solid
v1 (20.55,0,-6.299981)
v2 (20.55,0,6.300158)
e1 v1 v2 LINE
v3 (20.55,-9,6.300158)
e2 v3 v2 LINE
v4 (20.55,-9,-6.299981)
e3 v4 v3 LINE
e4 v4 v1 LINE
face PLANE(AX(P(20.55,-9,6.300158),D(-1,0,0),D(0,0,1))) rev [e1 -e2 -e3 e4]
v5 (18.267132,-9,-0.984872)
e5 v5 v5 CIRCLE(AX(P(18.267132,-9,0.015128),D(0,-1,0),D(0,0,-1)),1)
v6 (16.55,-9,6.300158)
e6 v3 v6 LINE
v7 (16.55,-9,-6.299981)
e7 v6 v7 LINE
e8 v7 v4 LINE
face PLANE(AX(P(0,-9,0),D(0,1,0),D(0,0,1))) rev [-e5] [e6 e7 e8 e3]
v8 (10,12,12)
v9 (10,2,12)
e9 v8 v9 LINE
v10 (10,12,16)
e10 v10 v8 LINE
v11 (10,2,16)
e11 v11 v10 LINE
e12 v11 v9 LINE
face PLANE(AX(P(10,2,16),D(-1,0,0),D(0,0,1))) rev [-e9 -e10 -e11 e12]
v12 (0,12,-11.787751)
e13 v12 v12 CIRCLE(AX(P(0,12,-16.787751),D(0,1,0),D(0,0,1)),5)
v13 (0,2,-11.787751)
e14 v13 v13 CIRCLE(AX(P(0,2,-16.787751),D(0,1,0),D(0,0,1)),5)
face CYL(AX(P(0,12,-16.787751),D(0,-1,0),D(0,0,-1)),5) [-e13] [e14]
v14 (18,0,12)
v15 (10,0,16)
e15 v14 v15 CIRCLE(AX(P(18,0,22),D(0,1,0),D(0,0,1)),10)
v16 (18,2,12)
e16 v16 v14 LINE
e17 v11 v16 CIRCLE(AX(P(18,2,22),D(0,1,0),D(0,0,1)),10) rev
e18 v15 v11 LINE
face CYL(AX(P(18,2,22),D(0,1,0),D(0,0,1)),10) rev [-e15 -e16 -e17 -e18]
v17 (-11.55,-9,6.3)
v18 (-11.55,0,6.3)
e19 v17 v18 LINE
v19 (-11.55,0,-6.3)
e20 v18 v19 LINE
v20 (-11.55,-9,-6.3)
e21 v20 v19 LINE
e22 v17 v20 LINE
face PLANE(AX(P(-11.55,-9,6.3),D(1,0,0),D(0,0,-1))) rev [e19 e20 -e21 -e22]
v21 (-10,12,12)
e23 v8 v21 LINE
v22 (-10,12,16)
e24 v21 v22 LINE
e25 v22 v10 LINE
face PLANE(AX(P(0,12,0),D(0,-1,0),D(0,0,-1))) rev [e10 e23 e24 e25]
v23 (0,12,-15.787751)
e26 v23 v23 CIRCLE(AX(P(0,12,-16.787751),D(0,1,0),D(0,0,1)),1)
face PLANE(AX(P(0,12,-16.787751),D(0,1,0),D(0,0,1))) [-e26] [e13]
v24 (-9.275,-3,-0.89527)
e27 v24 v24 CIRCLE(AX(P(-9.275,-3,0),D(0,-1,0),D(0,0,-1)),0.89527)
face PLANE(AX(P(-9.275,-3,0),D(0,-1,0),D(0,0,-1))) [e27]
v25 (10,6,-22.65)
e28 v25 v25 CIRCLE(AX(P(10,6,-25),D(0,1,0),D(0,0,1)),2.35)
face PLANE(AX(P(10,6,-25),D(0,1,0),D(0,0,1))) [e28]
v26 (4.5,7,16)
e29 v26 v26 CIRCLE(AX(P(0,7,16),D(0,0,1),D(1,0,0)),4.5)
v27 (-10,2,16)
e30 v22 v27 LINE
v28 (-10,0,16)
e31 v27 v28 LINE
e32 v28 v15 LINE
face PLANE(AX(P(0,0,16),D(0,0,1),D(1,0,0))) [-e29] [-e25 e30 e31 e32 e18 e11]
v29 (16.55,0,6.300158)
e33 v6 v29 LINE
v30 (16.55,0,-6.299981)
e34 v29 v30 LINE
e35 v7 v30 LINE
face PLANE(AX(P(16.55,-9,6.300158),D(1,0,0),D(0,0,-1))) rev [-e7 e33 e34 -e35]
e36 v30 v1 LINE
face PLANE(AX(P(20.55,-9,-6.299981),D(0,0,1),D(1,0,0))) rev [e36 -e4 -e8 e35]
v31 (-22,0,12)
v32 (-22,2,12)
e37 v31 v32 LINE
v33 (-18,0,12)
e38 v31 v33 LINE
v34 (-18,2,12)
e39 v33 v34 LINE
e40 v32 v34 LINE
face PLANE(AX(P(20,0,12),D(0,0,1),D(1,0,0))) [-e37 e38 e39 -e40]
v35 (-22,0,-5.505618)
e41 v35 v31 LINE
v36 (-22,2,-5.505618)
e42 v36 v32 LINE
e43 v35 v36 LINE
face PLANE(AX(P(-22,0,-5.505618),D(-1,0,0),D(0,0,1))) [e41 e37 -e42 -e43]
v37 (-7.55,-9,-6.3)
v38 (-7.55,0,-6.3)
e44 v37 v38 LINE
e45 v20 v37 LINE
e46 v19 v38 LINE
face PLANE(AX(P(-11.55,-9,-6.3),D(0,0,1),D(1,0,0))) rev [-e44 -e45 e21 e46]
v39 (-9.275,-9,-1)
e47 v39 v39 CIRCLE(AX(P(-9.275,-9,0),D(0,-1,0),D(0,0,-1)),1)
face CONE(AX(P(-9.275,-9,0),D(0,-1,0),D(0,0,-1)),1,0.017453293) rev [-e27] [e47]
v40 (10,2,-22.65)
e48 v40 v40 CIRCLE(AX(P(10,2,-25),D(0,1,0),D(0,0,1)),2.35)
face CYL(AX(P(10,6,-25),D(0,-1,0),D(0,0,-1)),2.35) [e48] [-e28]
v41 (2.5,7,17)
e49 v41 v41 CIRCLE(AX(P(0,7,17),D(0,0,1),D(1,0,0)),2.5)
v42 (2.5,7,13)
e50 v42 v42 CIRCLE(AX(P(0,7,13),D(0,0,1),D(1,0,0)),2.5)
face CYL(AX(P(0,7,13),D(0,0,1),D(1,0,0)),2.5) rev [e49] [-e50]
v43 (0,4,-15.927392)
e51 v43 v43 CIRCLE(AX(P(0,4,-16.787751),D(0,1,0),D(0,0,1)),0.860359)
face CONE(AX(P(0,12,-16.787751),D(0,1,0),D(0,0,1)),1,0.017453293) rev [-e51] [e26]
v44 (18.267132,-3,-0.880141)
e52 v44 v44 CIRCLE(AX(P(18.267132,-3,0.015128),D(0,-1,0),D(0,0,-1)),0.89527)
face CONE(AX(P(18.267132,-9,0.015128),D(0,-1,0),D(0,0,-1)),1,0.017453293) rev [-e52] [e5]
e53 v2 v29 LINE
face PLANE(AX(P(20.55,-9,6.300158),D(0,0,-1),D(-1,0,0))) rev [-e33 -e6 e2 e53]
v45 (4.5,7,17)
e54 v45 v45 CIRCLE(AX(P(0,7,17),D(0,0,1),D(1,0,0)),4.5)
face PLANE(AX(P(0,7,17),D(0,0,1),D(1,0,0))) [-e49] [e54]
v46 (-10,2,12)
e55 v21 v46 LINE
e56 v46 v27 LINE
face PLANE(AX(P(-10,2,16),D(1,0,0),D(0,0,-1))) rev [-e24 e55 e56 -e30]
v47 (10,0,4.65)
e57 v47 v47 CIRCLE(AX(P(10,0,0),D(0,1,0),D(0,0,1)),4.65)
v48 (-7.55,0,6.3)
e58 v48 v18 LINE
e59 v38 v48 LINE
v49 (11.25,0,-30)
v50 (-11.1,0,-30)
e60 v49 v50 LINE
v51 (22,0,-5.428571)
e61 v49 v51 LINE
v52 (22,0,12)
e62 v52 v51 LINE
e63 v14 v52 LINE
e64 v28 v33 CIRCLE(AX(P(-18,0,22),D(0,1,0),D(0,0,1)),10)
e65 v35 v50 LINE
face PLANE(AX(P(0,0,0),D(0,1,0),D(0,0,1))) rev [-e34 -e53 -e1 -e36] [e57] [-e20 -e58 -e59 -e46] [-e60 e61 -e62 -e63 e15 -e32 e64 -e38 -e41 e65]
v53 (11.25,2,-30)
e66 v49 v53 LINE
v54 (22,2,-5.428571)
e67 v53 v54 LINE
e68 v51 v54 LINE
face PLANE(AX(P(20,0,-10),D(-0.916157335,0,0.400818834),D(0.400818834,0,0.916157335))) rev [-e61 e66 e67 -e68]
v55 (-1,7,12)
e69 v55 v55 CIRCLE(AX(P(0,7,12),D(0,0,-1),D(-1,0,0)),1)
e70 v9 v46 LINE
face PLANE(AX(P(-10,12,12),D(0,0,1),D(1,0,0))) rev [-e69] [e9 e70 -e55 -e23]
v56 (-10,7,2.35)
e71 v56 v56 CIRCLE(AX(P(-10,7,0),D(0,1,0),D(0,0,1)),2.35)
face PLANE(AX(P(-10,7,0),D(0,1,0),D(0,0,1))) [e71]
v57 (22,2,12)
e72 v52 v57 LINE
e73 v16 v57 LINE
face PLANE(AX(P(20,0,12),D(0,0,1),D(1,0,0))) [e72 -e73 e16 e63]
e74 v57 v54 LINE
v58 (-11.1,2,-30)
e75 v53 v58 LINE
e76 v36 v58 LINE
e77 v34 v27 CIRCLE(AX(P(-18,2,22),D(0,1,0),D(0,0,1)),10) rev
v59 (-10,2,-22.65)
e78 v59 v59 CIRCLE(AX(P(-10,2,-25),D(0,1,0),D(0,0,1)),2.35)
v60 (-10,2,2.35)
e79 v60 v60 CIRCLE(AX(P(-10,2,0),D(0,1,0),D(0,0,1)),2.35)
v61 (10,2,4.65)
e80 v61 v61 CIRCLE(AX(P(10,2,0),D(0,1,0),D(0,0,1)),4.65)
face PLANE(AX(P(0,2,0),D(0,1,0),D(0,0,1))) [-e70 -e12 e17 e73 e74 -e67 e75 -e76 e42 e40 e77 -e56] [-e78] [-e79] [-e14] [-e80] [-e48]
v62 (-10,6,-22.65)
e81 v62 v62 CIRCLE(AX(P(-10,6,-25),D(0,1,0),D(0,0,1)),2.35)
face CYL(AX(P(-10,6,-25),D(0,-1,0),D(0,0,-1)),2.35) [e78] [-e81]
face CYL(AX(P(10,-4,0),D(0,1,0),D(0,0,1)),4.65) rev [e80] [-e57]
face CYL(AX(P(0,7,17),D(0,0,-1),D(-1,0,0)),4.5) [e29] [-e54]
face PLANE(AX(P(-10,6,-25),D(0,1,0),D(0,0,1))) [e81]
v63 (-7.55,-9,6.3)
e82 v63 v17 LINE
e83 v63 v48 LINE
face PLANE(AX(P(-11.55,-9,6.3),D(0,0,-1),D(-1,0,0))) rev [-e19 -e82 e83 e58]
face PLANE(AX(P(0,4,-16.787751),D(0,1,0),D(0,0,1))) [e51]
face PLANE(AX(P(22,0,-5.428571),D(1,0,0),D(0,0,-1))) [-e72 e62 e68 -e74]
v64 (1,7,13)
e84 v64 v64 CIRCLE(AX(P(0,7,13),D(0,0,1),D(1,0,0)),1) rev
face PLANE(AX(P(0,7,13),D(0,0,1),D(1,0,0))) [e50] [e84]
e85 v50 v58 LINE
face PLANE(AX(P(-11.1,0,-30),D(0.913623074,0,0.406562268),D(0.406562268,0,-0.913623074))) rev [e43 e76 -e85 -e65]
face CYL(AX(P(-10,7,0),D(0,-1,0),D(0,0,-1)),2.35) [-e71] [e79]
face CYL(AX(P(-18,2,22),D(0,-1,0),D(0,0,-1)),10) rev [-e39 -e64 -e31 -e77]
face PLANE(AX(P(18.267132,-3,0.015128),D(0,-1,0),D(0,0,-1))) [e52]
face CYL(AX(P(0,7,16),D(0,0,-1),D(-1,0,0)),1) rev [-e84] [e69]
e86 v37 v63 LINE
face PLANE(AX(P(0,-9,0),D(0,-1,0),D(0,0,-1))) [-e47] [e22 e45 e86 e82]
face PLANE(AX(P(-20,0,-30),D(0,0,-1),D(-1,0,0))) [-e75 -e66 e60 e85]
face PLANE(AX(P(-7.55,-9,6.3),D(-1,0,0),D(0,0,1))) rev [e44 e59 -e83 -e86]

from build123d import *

# Parameters (mm, degrees)
SKETCH1_W                     = 40
SKETCH1_H                     = 20
BOSS_EXTRUDE1_DEPTH           = 2
SKETCH5_W                     = 50
SKETCH5_H                     = 20
BOSS_EXTRUDE4_DEPTH           = 2
SKETCH6_R                     = 2.35
BOSS_EXTRUDE5_DEPTH           = 4
SKETCH15_R                    = 4.65
CUT_EXTRUDE6_DEPTH            = 6
SKETCH17_W                    = 10
SKETCH17_H                    = 20
CUT_EXTRUDE8_DEPTH            = 43.614551505
CUT_EXTRUDE9_DEPTH            = 2
SKETCH19_R                    = 2.35
BOSS_EXTRUDE6_DEPTH           = 5
BOSS_EXTRUDE7_DEPTH           = 2
SKETCH21_R                    = 5
BOSS_EXTRUDE8_DEPTH           = 10
SKETCH22_R                    = 1
CUT_EXTRUDE10_DEPTH           = 8
CUT_EXTRUDE10_DRAFT           = -1
SKETCH23_W                    = 4
SKETCH23_H                    = 12.6
SKETCH23_H_2                  = 12.600139219
BOSS_EXTRUDE9_DEPTH           = 9
SKETCH24_R                    = 1
CUT_EXTRUDE11_DEPTH           = 6
CUT_EXTRUDE11_DRAFT           = -1
CUT_EXTRUDE11_PROFILE_2_DEPTH = 6
CUT_EXTRUDE11_PROFILE_2_DRAFT = -1
SKETCH25_W                    = 20
SKETCH25_H                    = 2
BOSS_EXTRUDE10_DEPTH          = 4
SKETCH26_W                    = 20
SKETCH26_H                    = 4
BOSS_EXTRUDE11_DEPTH          = 10
FILLET1_R                     = 10
SKETCH27_R                    = 1
CUT_EXTRUDE13_DEPTH           = 49.908077043
SKETCH28_R                    = 2.5
CUT_EXTRUDE14_DEPTH           = 3
BOSS_EXTRUDE12_START          = 1
SKETCH29_R                    = 4.5
SKETCH29_R_2                  = 2.5
BOSS_EXTRUDE12_DEPTH          = 1


with BuildPart() as part:
    # Sketch1 → Boss-Extrude1 (new body)
    with BuildSketch(Plane(origin=(0, 0, 0), x_dir=(1, 0, 0), z_dir=(0, 1, 0))):
        Rectangle(SKETCH1_W, SKETCH1_H)
    extrude(amount=BOSS_EXTRUDE1_DEPTH)

    # Sketch5 → Boss-Extrude4 (add)
    with BuildSketch(Plane(origin=(0, 2, 0), x_dir=(1, 0, 0), z_dir=(0, 1, 0))):
        with Locations((5, 20)):
            Rectangle(SKETCH5_W, SKETCH5_H)
    extrude(amount=-BOSS_EXTRUDE4_DEPTH)

    # Sketch6 → Boss-Extrude5 (add)
    with BuildSketch(Plane(origin=(0, 2, 0), x_dir=(1, 0, 0), z_dir=(0, 1, 0))):
        with Locations(Location((-10, 25, 0), (0, 0, 270))):
            Circle(SKETCH6_R)
        with Locations(Location((10, 25, 0), (0, 0, 270))):
            Circle(SKETCH6_R)
    extrude(amount=BOSS_EXTRUDE5_DEPTH)

    # Sketch15 → Cut-Extrude6 (cut)
    with BuildSketch(Plane(origin=(0, 2, 0), x_dir=(1, 0, 0), z_dir=(0, 1, 0))):
        with Locations(Location((10, 0, 0), (0, 0, 270))):
            Circle(SKETCH15_R)
    extrude(amount=-CUT_EXTRUDE6_DEPTH, mode=Mode.SUBTRACT)

    # Sketch17 → Cut-Extrude8 (cut, through all)
    with BuildSketch(Plane(origin=(0, 2, 0), x_dir=(1, 0, 0), z_dir=(0, 1, 0))):
        with Locations((25, 20)):
            Rectangle(SKETCH17_W, SKETCH17_H)
    extrude(amount=-CUT_EXTRUDE8_DEPTH, mode=Mode.SUBTRACT)

    # Sketch18 → Cut-Extrude9 (cut)
    with BuildSketch(Plane(origin=(0, 2, 0), x_dir=(1, 0, 0), z_dir=(0, 1, 0))):
        Polygon((-11.1, 30), (-20, 10), (-20, 30), align=None)
        Polygon((20, 10), (11.25, 30), (20, 30), align=None)
    extrude(amount=-CUT_EXTRUDE9_DEPTH, mode=Mode.SUBTRACT)

    # Sketch19 → Boss-Extrude6 (add)
    with BuildSketch(Plane(origin=(0, 2, 0), x_dir=(1, 0, 0), z_dir=(0, 1, 0))):
        with Locations(Location((-10, 0, 0), (0, 0, 270))):
            Circle(SKETCH19_R)
    extrude(amount=BOSS_EXTRUDE6_DEPTH)

    # Sketch20 → Boss-Extrude7 (add)
    with BuildSketch(Plane(origin=(0, 2, 0), x_dir=(1, 0, 0), z_dir=(0, 1, 0))):
        Polygon((-20, 10), (-22, 5.505617978), (-22, -12), (-20, -12), (20, -12), (22, -12), (22, 5.428571429), (20, 10), (20, -10), (-20, -10), align=None)
    extrude(amount=-BOSS_EXTRUDE7_DEPTH)

    # Sketch21 → Boss-Extrude8 (add)
    with BuildSketch(Plane(origin=(0, 2, 0), x_dir=(1, 0, 0), z_dir=(0, 1, 0))):
        with Locations(Location((0, 16.787751337, 0), (0, 0, 270))):
            Circle(SKETCH21_R)
    extrude(amount=BOSS_EXTRUDE8_DEPTH)


with BuildPart() as cut_extrude10_tool:
    # Sketch22 → Cut-Extrude10 (with draft: the straight prism first)
    with BuildSketch(Plane(origin=(0, 12, 0), x_dir=(1, 0, 0), z_dir=(0, 1, 0))):
        with Locations((0, 16.787751337)):
            Circle(SKETCH22_R)
    extrude(amount=-CUT_EXTRUDE10_DEPTH)
    # Cut-Extrude10: the draft: its side faces are tilted about the plane it starts from
    cut_extrude10_sides = [cut_extrude10_tool.faces().sort_by_distance(p)[0] for p in [
        (-1, 8, -16.787751337),
    ]]
    draft(cut_extrude10_sides, Plane(origin=(0, 12, 0), x_dir=(1, 0, 0), z_dir=(0, 1, 0)), CUT_EXTRUDE10_DRAFT)


with BuildPart() as part_1:
    add(part.part)

    # Cut-Extrude10: cut by cut_extrude10_tool
    add(cut_extrude10_tool.part, mode=Mode.SUBTRACT)

    # Sketch23 → Boss-Extrude9 (add)
    with BuildSketch(Plane.XZ):
        with Locations((-9.55, 0)):
            Rectangle(SKETCH23_W, SKETCH23_H)
        with Locations((18.549999997, 8.8752e-05)):
            Rectangle(SKETCH23_W, SKETCH23_H_2)
    extrude(amount=BOSS_EXTRUDE9_DEPTH)


with BuildPart() as cut_extrude11_tool:
    # Sketch24 → Cut-Extrude11 (with draft: the straight prism first)
    with BuildSketch(Plane.XZ.offset(9)):
        with Locations((18.267131572, 0.01512814)):
            Circle(SKETCH24_R)
    extrude(amount=-CUT_EXTRUDE11_DEPTH)
    # Cut-Extrude11: the draft: its side faces are tilted about the plane it starts from
    cut_extrude11_sides = [cut_extrude11_tool.faces().sort_by_distance(p)[0] for p in [
        (17.267131572, -6, 0.01512814),
    ]]
    draft(cut_extrude11_sides, Plane.XZ.offset(9), CUT_EXTRUDE11_DRAFT)


with BuildPart() as part_2:
    add(part_1.part)

    # Cut-Extrude11: cut by cut_extrude11_tool
    add(cut_extrude11_tool.part, mode=Mode.SUBTRACT)


with BuildPart() as cut_extrude11_profile_2_tool:
    # Sketch24 → Cut-Extrude11 profile 2 (with draft: the straight prism first)
    with BuildSketch(Plane.XZ.offset(9)):
        with Locations((-9.275, 0)):
            Circle(SKETCH24_R)
    extrude(amount=-CUT_EXTRUDE11_PROFILE_2_DEPTH)
    # Cut-Extrude11 profile 2: the draft: its side faces are tilted about the plane it starts from
    cut_extrude11_profile_2_sides = [cut_extrude11_profile_2_tool.faces().sort_by_distance(p)[0] for p in [
        (-10.275, -6, 0),
    ]]
    draft(cut_extrude11_profile_2_sides, Plane.XZ.offset(9), CUT_EXTRUDE11_PROFILE_2_DRAFT)


with BuildPart() as part_3:
    add(part_2.part)

    # Cut-Extrude11 profile 2: cut by cut_extrude11_profile_2_tool
    add(cut_extrude11_profile_2_tool.part, mode=Mode.SUBTRACT)

    # Sketch25 → Boss-Extrude10 (add)
    with BuildSketch(Plane.XY.offset(12)):
        with Locations((0, 1)):
            Rectangle(SKETCH25_W, SKETCH25_H)
    extrude(amount=BOSS_EXTRUDE10_DEPTH)

    # Sketch26 → Boss-Extrude11 (add)
    with BuildSketch(Plane(origin=(0, 2, 0), x_dir=(1, 0, 0), z_dir=(0, 1, 0))):
        with Locations((0, -14)):
            Rectangle(SKETCH26_W, SKETCH26_H)
    extrude(amount=BOSS_EXTRUDE11_DEPTH)

    # Fillet1
    # the kernel refuses this fillet: 10 mm, written as the material it adds along each edge
    with BuildSketch(Plane(origin=(10, 2, 12), x_dir=(0, 0, 1), z_dir=(0, -1, 0)), Plane(origin=(-10, 0, 12), x_dir=(0, 0, 1), z_dir=(0, 1, 0))) as fillet1_piece_1:
        with BuildLine():
            CenterArc((10, -8), FILLET1_R, 126.869897646, 53.130102354)
            Line((0, -8), (0, 0))
            Line((0, 0), (4, 0))
        make_face()
    extrude(amount=2)

    # Sketch27 → Cut-Extrude13 (cut, through all)
    with BuildSketch(Plane(origin=(0, 0, 12), x_dir=(-1, 0, 0), z_dir=(0, 0, -1))):
        with Locations((0, 7)):
            Circle(SKETCH27_R)
    extrude(amount=-CUT_EXTRUDE13_DEPTH, mode=Mode.SUBTRACT)

    # Sketch28 → Cut-Extrude14 (cut)
    with BuildSketch(Plane.XY.offset(16)):
        with Locations((0, 7)):
            Circle(SKETCH28_R)
    extrude(amount=-CUT_EXTRUDE14_DEPTH, mode=Mode.SUBTRACT)

    # Sketch29 → Boss-Extrude12 (add)
    with BuildSketch(Plane.XY.offset(16).offset(BOSS_EXTRUDE12_START)):
        with Locations((0, 7)):
            Circle(SKETCH29_R)
        with Locations((0, 7)):
            Circle(SKETCH29_R_2, mode=Mode.SUBTRACT)
    extrude(amount=-BOSS_EXTRUDE12_DEPTH)


solid = part_3.part
